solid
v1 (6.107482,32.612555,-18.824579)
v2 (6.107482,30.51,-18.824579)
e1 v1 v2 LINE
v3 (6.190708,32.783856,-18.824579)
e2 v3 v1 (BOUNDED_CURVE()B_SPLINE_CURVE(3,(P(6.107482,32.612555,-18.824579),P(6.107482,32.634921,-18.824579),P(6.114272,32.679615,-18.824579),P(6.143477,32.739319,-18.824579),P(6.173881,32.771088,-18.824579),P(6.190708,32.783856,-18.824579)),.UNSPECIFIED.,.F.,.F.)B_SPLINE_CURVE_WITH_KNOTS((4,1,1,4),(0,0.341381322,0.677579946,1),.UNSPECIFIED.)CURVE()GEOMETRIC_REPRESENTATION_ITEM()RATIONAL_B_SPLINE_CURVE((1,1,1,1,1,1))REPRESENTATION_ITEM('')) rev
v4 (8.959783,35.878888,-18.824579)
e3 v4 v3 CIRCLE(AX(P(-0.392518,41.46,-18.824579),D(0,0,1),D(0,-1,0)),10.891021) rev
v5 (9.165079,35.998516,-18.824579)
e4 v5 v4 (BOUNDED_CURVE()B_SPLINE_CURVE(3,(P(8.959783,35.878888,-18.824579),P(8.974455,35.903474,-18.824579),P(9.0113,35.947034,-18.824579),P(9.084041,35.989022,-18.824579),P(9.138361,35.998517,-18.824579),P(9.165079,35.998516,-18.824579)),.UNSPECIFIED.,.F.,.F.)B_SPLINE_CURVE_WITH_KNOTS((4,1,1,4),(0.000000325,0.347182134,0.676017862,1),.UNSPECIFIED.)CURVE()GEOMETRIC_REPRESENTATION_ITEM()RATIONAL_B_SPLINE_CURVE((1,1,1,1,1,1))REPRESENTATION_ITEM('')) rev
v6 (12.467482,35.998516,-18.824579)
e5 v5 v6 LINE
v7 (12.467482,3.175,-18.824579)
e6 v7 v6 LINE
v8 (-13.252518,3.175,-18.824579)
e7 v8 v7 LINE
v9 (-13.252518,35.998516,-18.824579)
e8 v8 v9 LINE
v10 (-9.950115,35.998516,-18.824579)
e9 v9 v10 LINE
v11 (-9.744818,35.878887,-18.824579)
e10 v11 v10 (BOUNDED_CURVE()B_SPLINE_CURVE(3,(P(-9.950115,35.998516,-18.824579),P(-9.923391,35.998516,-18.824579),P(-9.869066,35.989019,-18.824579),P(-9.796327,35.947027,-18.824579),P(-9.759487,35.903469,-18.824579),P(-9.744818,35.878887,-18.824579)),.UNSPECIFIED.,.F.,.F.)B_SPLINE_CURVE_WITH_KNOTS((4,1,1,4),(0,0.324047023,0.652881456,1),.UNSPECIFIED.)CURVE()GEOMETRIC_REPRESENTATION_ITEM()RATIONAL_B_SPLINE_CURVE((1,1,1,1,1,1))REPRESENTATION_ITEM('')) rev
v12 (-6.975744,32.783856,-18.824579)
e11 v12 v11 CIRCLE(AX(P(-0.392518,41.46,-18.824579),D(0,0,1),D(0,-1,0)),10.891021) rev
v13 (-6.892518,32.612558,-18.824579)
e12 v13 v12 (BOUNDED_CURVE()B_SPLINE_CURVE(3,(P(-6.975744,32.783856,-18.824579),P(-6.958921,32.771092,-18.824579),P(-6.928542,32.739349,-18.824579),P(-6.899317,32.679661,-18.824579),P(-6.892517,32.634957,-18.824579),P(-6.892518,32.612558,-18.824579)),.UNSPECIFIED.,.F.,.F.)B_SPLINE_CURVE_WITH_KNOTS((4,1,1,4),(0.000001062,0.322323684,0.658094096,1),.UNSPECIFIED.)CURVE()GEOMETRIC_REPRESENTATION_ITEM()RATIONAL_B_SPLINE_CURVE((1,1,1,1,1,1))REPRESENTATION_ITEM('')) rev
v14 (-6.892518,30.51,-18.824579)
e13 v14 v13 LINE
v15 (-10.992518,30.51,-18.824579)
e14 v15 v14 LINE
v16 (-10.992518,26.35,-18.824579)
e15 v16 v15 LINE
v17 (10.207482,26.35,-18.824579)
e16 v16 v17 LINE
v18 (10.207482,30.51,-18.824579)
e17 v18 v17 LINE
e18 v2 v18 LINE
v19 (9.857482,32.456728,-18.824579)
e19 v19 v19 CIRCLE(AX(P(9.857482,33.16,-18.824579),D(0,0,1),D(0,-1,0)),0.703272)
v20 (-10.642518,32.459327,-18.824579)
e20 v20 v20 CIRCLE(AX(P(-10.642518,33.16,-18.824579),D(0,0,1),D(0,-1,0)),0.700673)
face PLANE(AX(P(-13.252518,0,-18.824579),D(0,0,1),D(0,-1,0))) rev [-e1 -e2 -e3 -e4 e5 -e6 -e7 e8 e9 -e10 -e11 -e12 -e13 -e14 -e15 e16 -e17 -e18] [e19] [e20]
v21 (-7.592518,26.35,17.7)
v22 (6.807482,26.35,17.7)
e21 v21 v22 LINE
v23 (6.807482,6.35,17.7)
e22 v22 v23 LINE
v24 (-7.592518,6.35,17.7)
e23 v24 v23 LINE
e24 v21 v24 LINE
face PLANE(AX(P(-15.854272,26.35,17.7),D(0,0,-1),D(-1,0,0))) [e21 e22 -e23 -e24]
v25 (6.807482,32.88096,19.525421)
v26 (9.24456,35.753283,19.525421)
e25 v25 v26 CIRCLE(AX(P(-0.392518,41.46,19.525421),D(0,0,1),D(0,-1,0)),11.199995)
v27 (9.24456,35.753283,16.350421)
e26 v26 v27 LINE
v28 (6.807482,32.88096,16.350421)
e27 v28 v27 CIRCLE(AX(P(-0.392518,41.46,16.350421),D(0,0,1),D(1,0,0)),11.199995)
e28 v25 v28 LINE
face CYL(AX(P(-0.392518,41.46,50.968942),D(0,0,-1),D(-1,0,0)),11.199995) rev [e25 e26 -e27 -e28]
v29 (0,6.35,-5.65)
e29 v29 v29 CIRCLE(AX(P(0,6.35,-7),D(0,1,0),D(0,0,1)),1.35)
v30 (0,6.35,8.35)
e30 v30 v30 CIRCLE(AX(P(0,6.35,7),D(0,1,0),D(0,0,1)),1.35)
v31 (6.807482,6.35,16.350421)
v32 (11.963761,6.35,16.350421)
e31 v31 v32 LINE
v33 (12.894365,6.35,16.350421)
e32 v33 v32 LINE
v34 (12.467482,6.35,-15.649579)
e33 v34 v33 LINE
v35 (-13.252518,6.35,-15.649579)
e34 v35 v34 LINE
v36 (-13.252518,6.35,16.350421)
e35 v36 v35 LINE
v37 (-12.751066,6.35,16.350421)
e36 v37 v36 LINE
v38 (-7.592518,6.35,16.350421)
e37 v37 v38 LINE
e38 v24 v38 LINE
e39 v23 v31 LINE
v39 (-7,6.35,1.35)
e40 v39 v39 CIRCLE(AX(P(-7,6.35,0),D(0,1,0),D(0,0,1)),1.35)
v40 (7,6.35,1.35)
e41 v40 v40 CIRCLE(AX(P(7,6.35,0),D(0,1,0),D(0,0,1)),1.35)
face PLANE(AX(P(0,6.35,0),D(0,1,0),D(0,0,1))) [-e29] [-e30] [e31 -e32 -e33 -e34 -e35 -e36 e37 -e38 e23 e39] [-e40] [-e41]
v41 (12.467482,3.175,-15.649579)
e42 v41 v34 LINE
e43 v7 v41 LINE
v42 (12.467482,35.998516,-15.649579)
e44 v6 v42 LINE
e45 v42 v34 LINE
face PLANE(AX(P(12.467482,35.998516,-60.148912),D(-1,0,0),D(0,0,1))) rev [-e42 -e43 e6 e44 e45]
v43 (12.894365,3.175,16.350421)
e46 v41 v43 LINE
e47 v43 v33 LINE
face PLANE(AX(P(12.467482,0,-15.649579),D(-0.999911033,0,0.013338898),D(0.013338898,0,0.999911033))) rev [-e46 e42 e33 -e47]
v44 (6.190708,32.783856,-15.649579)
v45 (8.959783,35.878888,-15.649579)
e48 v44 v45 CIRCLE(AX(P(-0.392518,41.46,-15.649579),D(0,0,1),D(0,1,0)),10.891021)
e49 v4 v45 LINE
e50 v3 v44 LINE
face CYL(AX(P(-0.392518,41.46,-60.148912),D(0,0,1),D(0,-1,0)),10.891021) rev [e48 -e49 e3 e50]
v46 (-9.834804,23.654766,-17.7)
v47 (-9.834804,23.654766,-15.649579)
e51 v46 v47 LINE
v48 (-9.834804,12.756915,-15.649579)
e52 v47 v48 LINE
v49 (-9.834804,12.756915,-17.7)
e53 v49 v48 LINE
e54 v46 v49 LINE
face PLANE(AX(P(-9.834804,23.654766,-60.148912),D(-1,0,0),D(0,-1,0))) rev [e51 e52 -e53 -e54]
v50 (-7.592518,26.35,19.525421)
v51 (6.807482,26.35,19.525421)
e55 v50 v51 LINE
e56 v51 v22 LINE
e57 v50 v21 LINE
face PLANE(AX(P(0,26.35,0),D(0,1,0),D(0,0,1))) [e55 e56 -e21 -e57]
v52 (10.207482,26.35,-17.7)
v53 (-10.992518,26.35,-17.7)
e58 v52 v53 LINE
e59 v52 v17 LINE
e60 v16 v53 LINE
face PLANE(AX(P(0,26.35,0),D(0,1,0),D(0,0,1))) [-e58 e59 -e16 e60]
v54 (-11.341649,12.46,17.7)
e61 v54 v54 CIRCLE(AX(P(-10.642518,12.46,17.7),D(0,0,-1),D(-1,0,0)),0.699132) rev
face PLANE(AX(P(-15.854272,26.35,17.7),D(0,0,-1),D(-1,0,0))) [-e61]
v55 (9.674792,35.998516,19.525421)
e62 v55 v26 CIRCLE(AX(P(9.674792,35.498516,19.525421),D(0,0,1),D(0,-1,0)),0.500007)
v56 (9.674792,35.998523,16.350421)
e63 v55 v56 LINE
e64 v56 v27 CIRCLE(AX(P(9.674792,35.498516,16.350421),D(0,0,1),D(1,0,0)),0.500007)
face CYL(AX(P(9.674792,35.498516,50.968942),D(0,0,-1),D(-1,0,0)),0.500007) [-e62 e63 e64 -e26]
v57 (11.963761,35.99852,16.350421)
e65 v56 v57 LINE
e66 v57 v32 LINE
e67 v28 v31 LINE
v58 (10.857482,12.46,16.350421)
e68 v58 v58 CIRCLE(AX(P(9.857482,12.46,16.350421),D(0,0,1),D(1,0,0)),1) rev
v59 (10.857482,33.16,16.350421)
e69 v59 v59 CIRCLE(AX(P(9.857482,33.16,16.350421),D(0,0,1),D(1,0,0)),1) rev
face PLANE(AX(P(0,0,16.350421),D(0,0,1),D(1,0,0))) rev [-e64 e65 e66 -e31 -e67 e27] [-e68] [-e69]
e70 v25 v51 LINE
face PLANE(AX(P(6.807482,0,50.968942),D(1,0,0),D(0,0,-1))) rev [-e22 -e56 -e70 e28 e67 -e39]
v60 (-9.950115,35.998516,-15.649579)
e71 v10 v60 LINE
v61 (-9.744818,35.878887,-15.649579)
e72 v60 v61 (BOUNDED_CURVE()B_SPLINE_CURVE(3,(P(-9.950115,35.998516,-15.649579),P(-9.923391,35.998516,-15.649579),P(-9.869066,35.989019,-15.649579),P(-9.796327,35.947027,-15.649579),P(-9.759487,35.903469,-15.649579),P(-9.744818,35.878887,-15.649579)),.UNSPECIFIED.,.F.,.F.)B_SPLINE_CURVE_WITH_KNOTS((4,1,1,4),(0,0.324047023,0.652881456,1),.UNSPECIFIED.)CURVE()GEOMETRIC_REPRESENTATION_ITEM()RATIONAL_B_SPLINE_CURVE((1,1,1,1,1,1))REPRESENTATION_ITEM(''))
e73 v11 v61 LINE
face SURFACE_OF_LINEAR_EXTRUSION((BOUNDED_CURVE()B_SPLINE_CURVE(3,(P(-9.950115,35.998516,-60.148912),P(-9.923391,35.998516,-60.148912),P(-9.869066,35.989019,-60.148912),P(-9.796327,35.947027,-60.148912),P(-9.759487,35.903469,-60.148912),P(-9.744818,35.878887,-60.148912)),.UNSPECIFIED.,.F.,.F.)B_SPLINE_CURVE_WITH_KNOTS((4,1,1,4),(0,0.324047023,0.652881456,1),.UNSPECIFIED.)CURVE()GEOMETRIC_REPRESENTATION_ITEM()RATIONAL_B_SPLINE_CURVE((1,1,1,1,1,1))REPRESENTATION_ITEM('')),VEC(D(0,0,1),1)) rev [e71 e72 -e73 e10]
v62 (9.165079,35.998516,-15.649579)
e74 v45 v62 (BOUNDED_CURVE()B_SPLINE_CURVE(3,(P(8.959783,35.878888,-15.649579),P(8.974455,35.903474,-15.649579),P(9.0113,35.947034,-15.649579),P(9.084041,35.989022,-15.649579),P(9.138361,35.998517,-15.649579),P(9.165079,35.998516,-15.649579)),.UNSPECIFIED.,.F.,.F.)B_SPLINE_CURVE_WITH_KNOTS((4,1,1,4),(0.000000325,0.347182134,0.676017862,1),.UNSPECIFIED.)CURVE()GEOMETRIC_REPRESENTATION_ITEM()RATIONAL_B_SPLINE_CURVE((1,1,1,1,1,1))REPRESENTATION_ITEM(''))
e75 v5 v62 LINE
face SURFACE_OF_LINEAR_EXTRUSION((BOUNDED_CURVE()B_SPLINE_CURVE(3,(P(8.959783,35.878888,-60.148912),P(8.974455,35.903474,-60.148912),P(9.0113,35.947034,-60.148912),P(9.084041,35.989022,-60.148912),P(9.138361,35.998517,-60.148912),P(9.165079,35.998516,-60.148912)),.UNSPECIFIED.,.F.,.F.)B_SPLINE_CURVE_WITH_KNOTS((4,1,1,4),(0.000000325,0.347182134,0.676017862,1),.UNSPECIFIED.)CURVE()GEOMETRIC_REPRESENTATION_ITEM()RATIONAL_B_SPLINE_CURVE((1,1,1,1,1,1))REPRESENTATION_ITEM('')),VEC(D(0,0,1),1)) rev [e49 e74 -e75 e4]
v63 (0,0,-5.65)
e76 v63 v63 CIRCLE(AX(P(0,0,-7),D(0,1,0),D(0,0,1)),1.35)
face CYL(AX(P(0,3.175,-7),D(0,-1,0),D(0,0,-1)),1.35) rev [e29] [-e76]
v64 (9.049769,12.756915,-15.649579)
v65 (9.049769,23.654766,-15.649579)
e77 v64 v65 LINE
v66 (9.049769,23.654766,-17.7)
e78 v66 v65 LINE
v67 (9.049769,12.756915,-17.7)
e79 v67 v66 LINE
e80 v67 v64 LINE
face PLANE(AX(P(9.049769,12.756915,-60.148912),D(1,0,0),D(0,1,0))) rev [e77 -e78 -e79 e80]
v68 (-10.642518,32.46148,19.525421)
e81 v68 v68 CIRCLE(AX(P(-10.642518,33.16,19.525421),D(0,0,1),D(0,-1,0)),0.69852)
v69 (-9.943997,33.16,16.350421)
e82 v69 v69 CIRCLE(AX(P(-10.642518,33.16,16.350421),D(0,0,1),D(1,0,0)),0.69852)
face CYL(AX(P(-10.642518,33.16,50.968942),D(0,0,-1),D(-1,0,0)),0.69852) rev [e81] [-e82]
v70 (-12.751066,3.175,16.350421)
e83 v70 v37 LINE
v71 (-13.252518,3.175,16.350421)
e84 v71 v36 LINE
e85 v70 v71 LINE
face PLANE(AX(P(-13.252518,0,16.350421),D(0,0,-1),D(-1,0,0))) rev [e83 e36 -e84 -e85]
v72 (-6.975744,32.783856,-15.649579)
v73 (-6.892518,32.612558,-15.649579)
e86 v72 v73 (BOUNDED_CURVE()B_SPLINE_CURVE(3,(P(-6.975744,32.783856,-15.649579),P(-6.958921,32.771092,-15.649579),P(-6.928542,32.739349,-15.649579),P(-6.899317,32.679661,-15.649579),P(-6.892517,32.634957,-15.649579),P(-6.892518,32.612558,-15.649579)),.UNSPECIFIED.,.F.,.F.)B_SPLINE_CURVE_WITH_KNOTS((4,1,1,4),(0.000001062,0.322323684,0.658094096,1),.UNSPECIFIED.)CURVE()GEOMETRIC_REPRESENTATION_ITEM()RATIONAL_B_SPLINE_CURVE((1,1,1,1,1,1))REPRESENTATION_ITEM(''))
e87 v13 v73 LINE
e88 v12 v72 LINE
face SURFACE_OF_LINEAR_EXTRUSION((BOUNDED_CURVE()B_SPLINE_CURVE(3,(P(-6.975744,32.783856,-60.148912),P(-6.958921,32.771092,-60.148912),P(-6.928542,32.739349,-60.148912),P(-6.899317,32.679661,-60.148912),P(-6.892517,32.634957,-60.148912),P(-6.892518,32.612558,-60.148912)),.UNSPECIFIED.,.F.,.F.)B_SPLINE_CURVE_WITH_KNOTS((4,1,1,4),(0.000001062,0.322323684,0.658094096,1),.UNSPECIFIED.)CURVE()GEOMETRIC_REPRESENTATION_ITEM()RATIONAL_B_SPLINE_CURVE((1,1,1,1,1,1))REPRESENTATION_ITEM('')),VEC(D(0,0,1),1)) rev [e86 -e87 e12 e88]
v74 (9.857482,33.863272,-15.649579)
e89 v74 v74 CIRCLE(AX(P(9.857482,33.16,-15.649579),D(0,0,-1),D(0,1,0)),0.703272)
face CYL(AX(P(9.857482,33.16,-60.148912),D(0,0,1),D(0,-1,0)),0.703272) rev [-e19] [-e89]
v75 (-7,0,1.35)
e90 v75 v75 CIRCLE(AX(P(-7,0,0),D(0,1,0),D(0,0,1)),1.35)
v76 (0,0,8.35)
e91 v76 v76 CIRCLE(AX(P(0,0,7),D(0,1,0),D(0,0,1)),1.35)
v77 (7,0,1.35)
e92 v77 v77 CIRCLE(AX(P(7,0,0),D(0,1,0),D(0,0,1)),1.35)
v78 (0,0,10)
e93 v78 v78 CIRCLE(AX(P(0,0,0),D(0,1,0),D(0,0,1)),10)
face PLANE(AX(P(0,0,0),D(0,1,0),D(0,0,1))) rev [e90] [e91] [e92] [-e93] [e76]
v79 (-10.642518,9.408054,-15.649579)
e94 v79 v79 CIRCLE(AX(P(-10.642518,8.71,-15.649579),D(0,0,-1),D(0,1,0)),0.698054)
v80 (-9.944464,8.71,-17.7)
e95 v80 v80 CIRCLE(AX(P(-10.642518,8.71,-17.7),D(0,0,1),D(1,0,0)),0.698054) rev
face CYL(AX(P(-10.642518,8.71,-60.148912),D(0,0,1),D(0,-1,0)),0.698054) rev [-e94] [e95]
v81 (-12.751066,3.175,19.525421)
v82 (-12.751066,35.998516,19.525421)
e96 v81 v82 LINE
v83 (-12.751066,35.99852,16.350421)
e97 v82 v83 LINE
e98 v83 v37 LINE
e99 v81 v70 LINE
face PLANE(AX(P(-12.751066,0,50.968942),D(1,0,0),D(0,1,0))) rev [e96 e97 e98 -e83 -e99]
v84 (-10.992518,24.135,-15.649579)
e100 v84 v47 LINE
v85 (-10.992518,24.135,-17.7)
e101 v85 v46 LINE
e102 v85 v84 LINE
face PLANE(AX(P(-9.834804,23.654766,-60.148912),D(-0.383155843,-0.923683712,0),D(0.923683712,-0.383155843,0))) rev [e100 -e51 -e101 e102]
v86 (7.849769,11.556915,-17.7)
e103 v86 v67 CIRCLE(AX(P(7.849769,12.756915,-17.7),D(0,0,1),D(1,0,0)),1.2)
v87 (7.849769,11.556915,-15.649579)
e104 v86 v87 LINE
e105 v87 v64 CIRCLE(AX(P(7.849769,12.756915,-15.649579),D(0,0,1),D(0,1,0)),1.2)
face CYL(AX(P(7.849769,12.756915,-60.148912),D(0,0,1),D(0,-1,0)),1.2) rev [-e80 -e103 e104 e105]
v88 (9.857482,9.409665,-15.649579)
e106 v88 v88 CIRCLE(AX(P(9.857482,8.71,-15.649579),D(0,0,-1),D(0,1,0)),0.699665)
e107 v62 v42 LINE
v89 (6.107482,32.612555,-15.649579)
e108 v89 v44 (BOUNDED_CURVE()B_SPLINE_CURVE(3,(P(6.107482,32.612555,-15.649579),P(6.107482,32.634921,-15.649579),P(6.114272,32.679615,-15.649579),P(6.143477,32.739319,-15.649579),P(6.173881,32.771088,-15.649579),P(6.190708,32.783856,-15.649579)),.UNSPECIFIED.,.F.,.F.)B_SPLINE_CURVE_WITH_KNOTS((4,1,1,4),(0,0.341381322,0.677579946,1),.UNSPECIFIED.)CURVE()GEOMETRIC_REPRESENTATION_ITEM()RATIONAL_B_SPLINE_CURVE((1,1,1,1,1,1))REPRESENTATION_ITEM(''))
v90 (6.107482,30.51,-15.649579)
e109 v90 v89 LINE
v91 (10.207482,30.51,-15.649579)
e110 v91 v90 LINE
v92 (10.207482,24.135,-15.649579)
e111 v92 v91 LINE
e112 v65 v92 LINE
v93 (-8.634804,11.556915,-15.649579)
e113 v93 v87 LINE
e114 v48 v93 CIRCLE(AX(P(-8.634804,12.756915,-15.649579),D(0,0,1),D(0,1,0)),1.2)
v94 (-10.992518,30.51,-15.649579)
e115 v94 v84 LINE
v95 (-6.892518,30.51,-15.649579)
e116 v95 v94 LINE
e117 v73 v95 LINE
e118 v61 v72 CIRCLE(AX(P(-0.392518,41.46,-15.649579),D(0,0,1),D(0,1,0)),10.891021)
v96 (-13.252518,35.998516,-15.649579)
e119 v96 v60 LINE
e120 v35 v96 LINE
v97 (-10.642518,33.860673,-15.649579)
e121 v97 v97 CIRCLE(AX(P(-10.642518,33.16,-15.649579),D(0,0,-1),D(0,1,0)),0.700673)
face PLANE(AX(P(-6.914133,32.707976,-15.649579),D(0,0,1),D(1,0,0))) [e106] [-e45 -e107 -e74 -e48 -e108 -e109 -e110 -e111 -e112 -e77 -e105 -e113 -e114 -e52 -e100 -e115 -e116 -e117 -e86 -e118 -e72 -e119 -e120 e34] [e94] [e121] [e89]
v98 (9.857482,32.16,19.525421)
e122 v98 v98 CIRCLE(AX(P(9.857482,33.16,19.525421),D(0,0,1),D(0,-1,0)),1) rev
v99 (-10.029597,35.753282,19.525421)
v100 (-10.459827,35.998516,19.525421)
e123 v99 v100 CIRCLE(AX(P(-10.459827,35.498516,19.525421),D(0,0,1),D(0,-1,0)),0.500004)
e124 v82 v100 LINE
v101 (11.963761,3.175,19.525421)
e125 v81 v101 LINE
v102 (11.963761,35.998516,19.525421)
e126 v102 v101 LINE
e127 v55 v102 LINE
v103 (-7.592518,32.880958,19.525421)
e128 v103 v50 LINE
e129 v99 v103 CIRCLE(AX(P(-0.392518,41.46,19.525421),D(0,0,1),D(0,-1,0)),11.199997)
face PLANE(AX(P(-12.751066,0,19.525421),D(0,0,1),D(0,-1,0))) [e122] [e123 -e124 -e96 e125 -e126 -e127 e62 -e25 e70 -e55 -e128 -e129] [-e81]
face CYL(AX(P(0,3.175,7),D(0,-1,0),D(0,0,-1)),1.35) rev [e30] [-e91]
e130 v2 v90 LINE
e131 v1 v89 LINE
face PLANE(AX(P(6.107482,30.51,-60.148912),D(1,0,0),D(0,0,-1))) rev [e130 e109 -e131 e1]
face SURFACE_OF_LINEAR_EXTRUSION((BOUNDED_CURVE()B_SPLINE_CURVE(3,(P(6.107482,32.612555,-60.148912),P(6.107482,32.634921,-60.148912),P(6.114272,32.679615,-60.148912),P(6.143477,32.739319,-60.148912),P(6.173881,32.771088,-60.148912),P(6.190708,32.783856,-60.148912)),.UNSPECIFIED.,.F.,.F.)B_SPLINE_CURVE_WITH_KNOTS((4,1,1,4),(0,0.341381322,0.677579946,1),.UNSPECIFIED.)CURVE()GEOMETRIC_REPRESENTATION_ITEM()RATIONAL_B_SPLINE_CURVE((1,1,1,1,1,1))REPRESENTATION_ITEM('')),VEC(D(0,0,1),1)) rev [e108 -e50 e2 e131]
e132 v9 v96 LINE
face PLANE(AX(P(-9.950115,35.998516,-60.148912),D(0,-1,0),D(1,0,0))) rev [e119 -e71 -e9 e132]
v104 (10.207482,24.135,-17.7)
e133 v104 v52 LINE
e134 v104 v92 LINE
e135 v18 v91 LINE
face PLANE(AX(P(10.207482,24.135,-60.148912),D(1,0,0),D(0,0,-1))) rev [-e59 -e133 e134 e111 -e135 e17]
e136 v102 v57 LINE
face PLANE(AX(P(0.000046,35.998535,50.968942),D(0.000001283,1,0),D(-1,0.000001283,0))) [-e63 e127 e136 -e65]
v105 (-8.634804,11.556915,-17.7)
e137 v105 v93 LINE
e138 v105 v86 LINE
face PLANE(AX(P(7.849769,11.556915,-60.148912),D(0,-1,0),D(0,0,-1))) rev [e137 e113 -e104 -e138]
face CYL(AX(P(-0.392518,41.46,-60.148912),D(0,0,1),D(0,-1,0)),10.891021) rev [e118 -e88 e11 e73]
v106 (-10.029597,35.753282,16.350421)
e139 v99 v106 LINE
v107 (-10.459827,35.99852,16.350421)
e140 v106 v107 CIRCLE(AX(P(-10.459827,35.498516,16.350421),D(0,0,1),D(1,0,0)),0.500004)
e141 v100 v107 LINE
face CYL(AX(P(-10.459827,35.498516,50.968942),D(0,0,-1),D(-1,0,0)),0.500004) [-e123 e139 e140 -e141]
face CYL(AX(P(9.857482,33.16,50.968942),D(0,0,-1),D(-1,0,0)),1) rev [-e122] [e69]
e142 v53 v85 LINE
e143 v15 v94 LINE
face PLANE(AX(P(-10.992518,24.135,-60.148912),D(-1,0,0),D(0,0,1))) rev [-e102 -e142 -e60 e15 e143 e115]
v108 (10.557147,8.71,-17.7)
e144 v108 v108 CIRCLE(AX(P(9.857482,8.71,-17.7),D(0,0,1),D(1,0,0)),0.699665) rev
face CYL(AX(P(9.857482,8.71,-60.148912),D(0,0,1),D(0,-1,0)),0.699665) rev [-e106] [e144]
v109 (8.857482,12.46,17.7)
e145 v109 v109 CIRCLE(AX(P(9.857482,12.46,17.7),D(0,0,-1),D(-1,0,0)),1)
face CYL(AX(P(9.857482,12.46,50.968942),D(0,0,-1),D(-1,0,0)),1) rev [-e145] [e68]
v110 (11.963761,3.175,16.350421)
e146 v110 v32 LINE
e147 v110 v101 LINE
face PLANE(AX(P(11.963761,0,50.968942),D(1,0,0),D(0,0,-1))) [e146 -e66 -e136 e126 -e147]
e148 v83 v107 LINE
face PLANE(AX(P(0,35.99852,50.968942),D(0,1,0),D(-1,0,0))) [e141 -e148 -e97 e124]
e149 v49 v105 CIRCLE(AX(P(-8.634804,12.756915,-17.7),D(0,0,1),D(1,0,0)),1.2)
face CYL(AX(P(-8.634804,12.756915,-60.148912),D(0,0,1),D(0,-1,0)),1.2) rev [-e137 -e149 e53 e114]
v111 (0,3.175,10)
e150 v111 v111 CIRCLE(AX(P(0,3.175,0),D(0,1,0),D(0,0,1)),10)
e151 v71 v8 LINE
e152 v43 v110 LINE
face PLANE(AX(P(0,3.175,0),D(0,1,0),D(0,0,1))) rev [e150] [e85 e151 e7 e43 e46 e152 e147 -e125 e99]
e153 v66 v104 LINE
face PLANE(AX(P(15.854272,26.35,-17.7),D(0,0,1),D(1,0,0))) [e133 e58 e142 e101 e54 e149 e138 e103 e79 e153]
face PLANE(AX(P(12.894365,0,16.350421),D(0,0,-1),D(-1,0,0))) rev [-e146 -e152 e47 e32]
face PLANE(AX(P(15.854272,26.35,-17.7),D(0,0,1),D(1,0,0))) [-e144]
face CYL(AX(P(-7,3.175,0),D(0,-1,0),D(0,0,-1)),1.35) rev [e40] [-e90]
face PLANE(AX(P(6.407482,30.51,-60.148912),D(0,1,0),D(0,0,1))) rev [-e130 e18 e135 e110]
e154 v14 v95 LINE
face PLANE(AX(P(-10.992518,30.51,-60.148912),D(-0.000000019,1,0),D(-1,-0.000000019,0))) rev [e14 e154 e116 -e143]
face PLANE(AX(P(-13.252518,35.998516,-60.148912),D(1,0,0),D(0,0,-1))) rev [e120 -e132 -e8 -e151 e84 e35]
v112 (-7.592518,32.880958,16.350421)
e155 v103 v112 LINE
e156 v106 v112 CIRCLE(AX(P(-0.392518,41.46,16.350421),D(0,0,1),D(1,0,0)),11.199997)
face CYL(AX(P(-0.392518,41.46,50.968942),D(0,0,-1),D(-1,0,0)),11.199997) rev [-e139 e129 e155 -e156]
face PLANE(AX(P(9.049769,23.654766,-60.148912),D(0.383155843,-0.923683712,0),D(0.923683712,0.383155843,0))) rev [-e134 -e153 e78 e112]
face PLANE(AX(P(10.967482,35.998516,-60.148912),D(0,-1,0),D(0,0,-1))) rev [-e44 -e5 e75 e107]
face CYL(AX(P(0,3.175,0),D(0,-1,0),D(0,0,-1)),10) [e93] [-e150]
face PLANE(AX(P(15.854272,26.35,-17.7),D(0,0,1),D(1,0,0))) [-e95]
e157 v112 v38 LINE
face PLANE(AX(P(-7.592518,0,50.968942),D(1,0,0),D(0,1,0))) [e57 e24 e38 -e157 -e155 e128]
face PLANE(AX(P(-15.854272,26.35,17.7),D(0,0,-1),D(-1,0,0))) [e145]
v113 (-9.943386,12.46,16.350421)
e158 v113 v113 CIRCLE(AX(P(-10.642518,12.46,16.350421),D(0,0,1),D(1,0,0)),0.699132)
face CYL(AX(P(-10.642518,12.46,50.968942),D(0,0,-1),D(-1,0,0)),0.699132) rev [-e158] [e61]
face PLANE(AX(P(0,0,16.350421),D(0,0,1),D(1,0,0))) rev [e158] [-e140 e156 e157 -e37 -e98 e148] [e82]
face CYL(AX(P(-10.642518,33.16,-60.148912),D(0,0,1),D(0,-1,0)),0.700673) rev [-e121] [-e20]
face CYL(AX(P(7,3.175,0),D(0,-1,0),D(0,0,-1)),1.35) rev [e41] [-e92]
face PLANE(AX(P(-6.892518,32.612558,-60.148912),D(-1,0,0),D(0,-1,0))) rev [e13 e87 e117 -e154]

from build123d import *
from OCP.BRepAlgoAPI import BRepAlgoAPI_Cut
from OCP.TopTools import TopTools_ListOfShape

# Parameters (mm, degrees)
SKETCH1_R                 = 10
SKETCH1_R_2               = 1.35
BOSS_EXTRUDE1_DEPTH       = 3.175
SKETCH2_W                 = 38.058543228
SKETCH2_H                 = 41.75
SKETCH2_R                 = 1.35
BOSS_EXTRUDE2_DEPTH       = 3.175
SKETCH3_W                 = 38.058543228
SKETCH3_H                 = 41.75
SKETCH3_W_2               = 31.708543228
SKETCH3_H_2               = 35.4
BOSS_EXTRUDE3_DEPTH       = 20
FILLET1_R                 = 5
BOSS_EXTRUDE4_OUTLINE_R   = 1
BOSS_EXTRUDE4_OUTLINE_R_2 = 0.698520241
BOSS_EXTRUDE4_OUTLINE_R_3 = 0.699131638
BOSS_EXTRUDE4_DEPTH       = 4.524579022
SKETCH6_R                 = 0.699665004
SKETCH6_R_2               = 0.703272365
SKETCH6_R_3               = 0.700673295
SKETCH6_R_4               = 0.698053945
BOSS_EXTRUDE5_DEPTH       = 5.225420978
CUT_EXTRUDE3_DEPTH        = 39.629021569
CUT_EXTRUDE4_DEPTH        = 44.672508997


with BuildPart() as part:
    # Sketch1 → Boss-Extrude1 (new body)
    with BuildSketch(Plane(origin=(0, 0, 0), x_dir=(1, 0, 0), z_dir=(0, 1, 0))):
        with Locations(Location((0, 0, 0), (0, 0, 270))):
            Circle(SKETCH1_R)
        with Locations(Location((0, 7, 0), (0, 0, 270))):
            Circle(SKETCH1_R_2, mode=Mode.SUBTRACT)
        with Locations(Location((7, 0, 0), (0, 0, 270))):
            Circle(SKETCH1_R_2, mode=Mode.SUBTRACT)
        with Locations(Location((0, -7, 0), (0, 0, 270))):
            Circle(SKETCH1_R_2, mode=Mode.SUBTRACT)
        with Locations(Location((-7, 0, 0), (0, 0, 270))):
            Circle(SKETCH1_R_2, mode=Mode.SUBTRACT)
    extrude(amount=BOSS_EXTRUDE1_DEPTH)

    # Sketch2 → Boss-Extrude2 (add)
    with BuildSketch(Plane(origin=(0, 3.175, 0), x_dir=(1, 0, 0), z_dir=(0, 1, 0))):
        Rectangle(SKETCH2_W, SKETCH2_H)
        with Locations(Location((0, -7, 0), (0, 0, 270))):
            Circle(SKETCH2_R, mode=Mode.SUBTRACT)
        with Locations(Location((7, 0, 0), (0, 0, 270))):
            Circle(SKETCH2_R, mode=Mode.SUBTRACT)
        with Locations(Location((-7, 0, 0), (0, 0, 270))):
            Circle(SKETCH2_R, mode=Mode.SUBTRACT)
        with Locations(Location((0, 7, 0), (0, 0, 270))):
            Circle(SKETCH2_R, mode=Mode.SUBTRACT)
    extrude(amount=BOSS_EXTRUDE2_DEPTH)

    # Sketch3 → Boss-Extrude3 (add)
    with BuildSketch(Plane(origin=(0, 6.35, 0), x_dir=(1, 0, 0), z_dir=(0, 1, 0))):
        Rectangle(SKETCH3_W, SKETCH3_H)
        Rectangle(SKETCH3_W_2, SKETCH3_H_2, mode=Mode.SUBTRACT)
    extrude(amount=BOSS_EXTRUDE3_DEPTH)

    # Fillet1
    fillet1_edges = [part.edges().sort_by_distance(p)[0] for p in [
        (-19.029271614, 14.7625, -20.875),
        (-19.029271614, 14.7625, 20.875),
        (19.029271614, 14.7625, 20.875),
        (19.029271614, 14.7625, -20.875),
    ]]
    fillet(fillet1_edges, radius=FILLET1_R)

    # Boss-Extrude4: read off the stored shape, not the designer's step
    # Boss-Extrude4 outline → Boss-Extrude4 (add)
    # profile 1 of 2: a face of its own
    with BuildSketch(Plane.XY.offset(16.350420978)):
        with BuildLine():
            ThreePointArc((9.674791631, 35.998523082), (9.427181956, 35.932908065), (9.244559074, 35.753284112))
            ThreePointArc((9.244559074, 35.753284112), (8.147643376, 34.213929311), (6.807481387, 32.880961337))
            Line((6.807481387, 32.880961337), (6.807482447, 6.35))
            Line((6.807482447, 6.35), (11.963760646, 6.35))
            Line((11.963760646, 6.35), (11.963760646, 35.998520144))
            Line((11.963760646, 35.998520144), (9.674791631, 35.998523082))
        make_face()
        with Locations((9.857482447, 33.16)):
            Circle(BOSS_EXTRUDE4_OUTLINE_R, mode=Mode.SUBTRACT)
        with Locations((9.857482447, 12.46)):
            Circle(BOSS_EXTRUDE4_OUTLINE_R, mode=Mode.SUBTRACT)
    # profile 2 of 2: a face of its own
    with BuildSketch(Plane.XY.offset(16.350420978)):
        with BuildLine():
            Line((-12.751066043, 35.998520144), (-12.751066043, 6.35))
            Line((-12.751066043, 6.35), (-7.592517553, 6.35))
            Line((-7.592517553, 6.35), (-7.592516964, 32.880958857))
            ThreePointArc((-7.592516964, 32.880958857), (-8.932679762, 34.213927416), (-10.029597495, 35.753282149))
            ThreePointArc((-10.029597495, 35.753282149), (-10.212218516, 35.932905514), (-10.459826737, 35.998520144))
            Line((-10.459826737, 35.998520144), (-12.751066043, 35.998520144))
        make_face()
        with Locations((-10.642517553, 33.16)):
            Circle(BOSS_EXTRUDE4_OUTLINE_R_2, mode=Mode.SUBTRACT)
        with Locations((-10.642517553, 12.46)):
            Circle(BOSS_EXTRUDE4_OUTLINE_R_3, mode=Mode.SUBTRACT)
    extrude(amount=BOSS_EXTRUDE4_DEPTH)

    # Sketch6 → Boss-Extrude5 (add)
    with BuildSketch(Plane(origin=(0, 0, -15.649579022), x_dir=(-1, 0, 0), z_dir=(0, 0, -1))):
        with BuildLine():
            Line((10.992517553, 24.135), (10.992517553, 30.51))
            Line((10.992517553, 30.51), (7.192517366, 30.510000072))
            Line((7.192517366, 30.510000072), (6.892517553, 30.510000072))
            Line((6.892517553, 30.510000072), (6.892517553, 32.612557612))
            add(Edge.make_bspline(
                [(6.975743415, 32.783855976), (6.958921233, 32.771091761), (6.928542383, 32.73934935), (6.899316538, 32.679660552), (6.892517469, 32.634957243), (6.892517553, 32.612557612)],
                knots=[1.062e-06, 1.062e-06, 1.062e-06, 1.062e-06, 0.322323684, 0.658094096, 1, 1, 1, 1], degree=3, weights=[1, 1, 1, 1, 1, 1]))
            ThreePointArc((6.975743415, 32.783855976), (8.509170356, 34.198162413), (9.744817778, 35.878887355))
            add(Edge.make_bspline(
                [(9.950114528, 35.998516481), (9.923391157, 35.998516414), (9.869066225, 35.989019468), (9.796326784, 35.947026629), (9.759487209, 35.903468994), (9.744817778, 35.878887355)],
                knots=[0, 0, 0, 0, 0.324047023, 0.652881456, 1, 1, 1, 1], degree=3, weights=[1, 1, 1, 1, 1, 1]))
            Line((9.950114528, 35.998516481), (11.752517552, 35.998516481))
            Line((11.752517552, 35.998516481), (13.252517552, 35.998516481))
            Line((13.252517552, 35.998516481), (13.252517552, 6.318190736))
            Line((13.252517552, 6.318190736), (-12.46748245, 6.318190736))
            Line((-12.46748245, 6.318190736), (-12.46748245, 35.998516481))
            Line((-12.46748245, 35.998516481), (-10.96748245, 35.998516481))
            Line((-10.96748245, 35.998516481), (-9.165078771, 35.998516481))
            add(Edge.make_bspline(
                [(-8.959782959, 35.878887832), (-8.974454973, 35.903473814), (-9.011299786, 35.947034481), (-9.084041461, 35.989022268), (-9.138360889, 35.998516579), (-9.165078771, 35.998516481)],
                knots=[3.25e-07, 3.25e-07, 3.25e-07, 3.25e-07, 0.347182134, 0.676017862, 1, 1, 1, 1], degree=3, weights=[1, 1, 1, 1, 1, 1]))
            ThreePointArc((-8.959782959, 35.878887832), (-7.72413548, 34.198162669), (-6.190708414, 32.783856055))
            add(Edge.make_bspline(
                [(-6.107482447, 32.612555023), (-6.107481996, 32.634920643), (-6.114271613, 32.679614721), (-6.143476784, 32.739319032), (-6.173880837, 32.77108775), (-6.190708414, 32.783856055)],
                knots=[0, 0, 0, 0, 0.341381322, 0.677579946, 1, 1, 1, 1], degree=3, weights=[1, 1, 1, 1, 1, 1]))
            Line((-6.107482447, 32.612555023), (-6.107482447, 30.510000072))
            Line((-6.107482447, 30.510000072), (-6.407482262, 30.510000072))
            Line((-6.407482262, 30.510000072), (-10.207482447, 30.51))
            Line((-10.207482447, 30.51), (-10.207482447, 24.135))
            Line((-10.207482447, 24.135), (-9.049769141, 23.654765682))
            Line((-9.049769141, 23.654765682), (-9.049769141, 12.756914674))
            ThreePointArc((-9.049769141, 12.756914674), (-8.698297278, 11.908386539), (-7.849769141, 11.556914678))
            Line((-7.849769141, 11.556914678), (8.634804248, 11.556914678))
            ThreePointArc((8.634804248, 11.556914678), (9.483332385, 11.908386541), (9.834804247, 12.756914678))
            Line((9.834804247, 12.756914678), (9.834804247, 23.654765682))
            Line((9.834804247, 23.654765682), (10.992517553, 24.135))
        make_face()
        with Locations(Location((-9.857482447, 8.71, 0), (0, 0, 180))):
            Circle(SKETCH6_R, mode=Mode.SUBTRACT)
        with Locations(Location((-9.857482447, 33.16, 0), (0, 0, 180))):
            Circle(SKETCH6_R_2, mode=Mode.SUBTRACT)
        with Locations(Location((10.642517553, 33.16, 0), (0, 0, 180))):
            Circle(SKETCH6_R_3, mode=Mode.SUBTRACT)
        with Locations(Location((10.642517553, 8.71, 0), (0, 0, 180))):
            Circle(SKETCH6_R_4, mode=Mode.SUBTRACT)
    extrude(amount=BOSS_EXTRUDE5_DEPTH)

    # Sketch7 → Cut-Extrude3 (cut, through all)
    with BuildSketch(Plane(origin=(0, 26.35, 0), x_dir=(1, 0, 0), z_dir=(0, 1, 0))):
        Polygon((11.963760646, -16.350420978), (11.963760646, -22.528007323), (30.022930958, -23.761888284), (27.696884363, 28.84716935), (12.46748245, 20.875), (12.46748245, 15.649579022), (12.894365171, -16.350420978), align=None)
        Polygon((-12.751066043, -16.350420978), (-12.751066043, -23.761888284), (-21.517724294, -22.528007323), (-21.901635858, 22.206155736), (-13.252517552, 20.875), (-13.252517552, -16.350420978), align=None)
    extrude(amount=-CUT_EXTRUDE3_DEPTH, mode=Mode.SUBTRACT)


with BuildPart() as cut_extrude4_tool:
    # Sketch9 → Cut-Extrude4 (new, through all)
    with BuildSketch(Plane(origin=(-2e-09, 35.998516482, 0), x_dir=(1.0, 6.10309035182258e-11, 0), z_dir=(-6.10309035182258e-11, 1.0, -1.0368003232160358e-14))):
        Polygon((-12.751066041, -19.525420978), (13.891993445, -19.525420978), (13.555046053, -22.524424576), (-19.185008861, -22.524424576), align=None)
        Polygon((-13.25251755, 18.824579022), (15.127467216, 18.824579022), (13.105782864, 23.749676422), (-20.139693138, 23.131939537), align=None)
    extrude(amount=-CUT_EXTRUDE4_DEPTH)


with BuildPart() as part_1:
    add(part.part)

    # Cut-Extrude4: cut by cut_extrude4_tool, with a tolerance
    cut_extrude4_stock = TopTools_ListOfShape()
    cut_extrude4_stock.Append(part_1.part.wrapped)
    cut_extrude4_tools = TopTools_ListOfShape()
    cut_extrude4_tools.Append(cut_extrude4_tool.part.wrapped)
    cut_extrude4_cut = BRepAlgoAPI_Cut()
    cut_extrude4_cut.SetArguments(cut_extrude4_stock)
    cut_extrude4_cut.SetTools(cut_extrude4_tools)
    cut_extrude4_cut.SetFuzzyValue(0.00001)
    cut_extrude4_cut.Build()
    add(Compound.cast(cut_extrude4_cut.Shape()).solids(), mode=Mode.REPLACE)


solid = part_1.part
